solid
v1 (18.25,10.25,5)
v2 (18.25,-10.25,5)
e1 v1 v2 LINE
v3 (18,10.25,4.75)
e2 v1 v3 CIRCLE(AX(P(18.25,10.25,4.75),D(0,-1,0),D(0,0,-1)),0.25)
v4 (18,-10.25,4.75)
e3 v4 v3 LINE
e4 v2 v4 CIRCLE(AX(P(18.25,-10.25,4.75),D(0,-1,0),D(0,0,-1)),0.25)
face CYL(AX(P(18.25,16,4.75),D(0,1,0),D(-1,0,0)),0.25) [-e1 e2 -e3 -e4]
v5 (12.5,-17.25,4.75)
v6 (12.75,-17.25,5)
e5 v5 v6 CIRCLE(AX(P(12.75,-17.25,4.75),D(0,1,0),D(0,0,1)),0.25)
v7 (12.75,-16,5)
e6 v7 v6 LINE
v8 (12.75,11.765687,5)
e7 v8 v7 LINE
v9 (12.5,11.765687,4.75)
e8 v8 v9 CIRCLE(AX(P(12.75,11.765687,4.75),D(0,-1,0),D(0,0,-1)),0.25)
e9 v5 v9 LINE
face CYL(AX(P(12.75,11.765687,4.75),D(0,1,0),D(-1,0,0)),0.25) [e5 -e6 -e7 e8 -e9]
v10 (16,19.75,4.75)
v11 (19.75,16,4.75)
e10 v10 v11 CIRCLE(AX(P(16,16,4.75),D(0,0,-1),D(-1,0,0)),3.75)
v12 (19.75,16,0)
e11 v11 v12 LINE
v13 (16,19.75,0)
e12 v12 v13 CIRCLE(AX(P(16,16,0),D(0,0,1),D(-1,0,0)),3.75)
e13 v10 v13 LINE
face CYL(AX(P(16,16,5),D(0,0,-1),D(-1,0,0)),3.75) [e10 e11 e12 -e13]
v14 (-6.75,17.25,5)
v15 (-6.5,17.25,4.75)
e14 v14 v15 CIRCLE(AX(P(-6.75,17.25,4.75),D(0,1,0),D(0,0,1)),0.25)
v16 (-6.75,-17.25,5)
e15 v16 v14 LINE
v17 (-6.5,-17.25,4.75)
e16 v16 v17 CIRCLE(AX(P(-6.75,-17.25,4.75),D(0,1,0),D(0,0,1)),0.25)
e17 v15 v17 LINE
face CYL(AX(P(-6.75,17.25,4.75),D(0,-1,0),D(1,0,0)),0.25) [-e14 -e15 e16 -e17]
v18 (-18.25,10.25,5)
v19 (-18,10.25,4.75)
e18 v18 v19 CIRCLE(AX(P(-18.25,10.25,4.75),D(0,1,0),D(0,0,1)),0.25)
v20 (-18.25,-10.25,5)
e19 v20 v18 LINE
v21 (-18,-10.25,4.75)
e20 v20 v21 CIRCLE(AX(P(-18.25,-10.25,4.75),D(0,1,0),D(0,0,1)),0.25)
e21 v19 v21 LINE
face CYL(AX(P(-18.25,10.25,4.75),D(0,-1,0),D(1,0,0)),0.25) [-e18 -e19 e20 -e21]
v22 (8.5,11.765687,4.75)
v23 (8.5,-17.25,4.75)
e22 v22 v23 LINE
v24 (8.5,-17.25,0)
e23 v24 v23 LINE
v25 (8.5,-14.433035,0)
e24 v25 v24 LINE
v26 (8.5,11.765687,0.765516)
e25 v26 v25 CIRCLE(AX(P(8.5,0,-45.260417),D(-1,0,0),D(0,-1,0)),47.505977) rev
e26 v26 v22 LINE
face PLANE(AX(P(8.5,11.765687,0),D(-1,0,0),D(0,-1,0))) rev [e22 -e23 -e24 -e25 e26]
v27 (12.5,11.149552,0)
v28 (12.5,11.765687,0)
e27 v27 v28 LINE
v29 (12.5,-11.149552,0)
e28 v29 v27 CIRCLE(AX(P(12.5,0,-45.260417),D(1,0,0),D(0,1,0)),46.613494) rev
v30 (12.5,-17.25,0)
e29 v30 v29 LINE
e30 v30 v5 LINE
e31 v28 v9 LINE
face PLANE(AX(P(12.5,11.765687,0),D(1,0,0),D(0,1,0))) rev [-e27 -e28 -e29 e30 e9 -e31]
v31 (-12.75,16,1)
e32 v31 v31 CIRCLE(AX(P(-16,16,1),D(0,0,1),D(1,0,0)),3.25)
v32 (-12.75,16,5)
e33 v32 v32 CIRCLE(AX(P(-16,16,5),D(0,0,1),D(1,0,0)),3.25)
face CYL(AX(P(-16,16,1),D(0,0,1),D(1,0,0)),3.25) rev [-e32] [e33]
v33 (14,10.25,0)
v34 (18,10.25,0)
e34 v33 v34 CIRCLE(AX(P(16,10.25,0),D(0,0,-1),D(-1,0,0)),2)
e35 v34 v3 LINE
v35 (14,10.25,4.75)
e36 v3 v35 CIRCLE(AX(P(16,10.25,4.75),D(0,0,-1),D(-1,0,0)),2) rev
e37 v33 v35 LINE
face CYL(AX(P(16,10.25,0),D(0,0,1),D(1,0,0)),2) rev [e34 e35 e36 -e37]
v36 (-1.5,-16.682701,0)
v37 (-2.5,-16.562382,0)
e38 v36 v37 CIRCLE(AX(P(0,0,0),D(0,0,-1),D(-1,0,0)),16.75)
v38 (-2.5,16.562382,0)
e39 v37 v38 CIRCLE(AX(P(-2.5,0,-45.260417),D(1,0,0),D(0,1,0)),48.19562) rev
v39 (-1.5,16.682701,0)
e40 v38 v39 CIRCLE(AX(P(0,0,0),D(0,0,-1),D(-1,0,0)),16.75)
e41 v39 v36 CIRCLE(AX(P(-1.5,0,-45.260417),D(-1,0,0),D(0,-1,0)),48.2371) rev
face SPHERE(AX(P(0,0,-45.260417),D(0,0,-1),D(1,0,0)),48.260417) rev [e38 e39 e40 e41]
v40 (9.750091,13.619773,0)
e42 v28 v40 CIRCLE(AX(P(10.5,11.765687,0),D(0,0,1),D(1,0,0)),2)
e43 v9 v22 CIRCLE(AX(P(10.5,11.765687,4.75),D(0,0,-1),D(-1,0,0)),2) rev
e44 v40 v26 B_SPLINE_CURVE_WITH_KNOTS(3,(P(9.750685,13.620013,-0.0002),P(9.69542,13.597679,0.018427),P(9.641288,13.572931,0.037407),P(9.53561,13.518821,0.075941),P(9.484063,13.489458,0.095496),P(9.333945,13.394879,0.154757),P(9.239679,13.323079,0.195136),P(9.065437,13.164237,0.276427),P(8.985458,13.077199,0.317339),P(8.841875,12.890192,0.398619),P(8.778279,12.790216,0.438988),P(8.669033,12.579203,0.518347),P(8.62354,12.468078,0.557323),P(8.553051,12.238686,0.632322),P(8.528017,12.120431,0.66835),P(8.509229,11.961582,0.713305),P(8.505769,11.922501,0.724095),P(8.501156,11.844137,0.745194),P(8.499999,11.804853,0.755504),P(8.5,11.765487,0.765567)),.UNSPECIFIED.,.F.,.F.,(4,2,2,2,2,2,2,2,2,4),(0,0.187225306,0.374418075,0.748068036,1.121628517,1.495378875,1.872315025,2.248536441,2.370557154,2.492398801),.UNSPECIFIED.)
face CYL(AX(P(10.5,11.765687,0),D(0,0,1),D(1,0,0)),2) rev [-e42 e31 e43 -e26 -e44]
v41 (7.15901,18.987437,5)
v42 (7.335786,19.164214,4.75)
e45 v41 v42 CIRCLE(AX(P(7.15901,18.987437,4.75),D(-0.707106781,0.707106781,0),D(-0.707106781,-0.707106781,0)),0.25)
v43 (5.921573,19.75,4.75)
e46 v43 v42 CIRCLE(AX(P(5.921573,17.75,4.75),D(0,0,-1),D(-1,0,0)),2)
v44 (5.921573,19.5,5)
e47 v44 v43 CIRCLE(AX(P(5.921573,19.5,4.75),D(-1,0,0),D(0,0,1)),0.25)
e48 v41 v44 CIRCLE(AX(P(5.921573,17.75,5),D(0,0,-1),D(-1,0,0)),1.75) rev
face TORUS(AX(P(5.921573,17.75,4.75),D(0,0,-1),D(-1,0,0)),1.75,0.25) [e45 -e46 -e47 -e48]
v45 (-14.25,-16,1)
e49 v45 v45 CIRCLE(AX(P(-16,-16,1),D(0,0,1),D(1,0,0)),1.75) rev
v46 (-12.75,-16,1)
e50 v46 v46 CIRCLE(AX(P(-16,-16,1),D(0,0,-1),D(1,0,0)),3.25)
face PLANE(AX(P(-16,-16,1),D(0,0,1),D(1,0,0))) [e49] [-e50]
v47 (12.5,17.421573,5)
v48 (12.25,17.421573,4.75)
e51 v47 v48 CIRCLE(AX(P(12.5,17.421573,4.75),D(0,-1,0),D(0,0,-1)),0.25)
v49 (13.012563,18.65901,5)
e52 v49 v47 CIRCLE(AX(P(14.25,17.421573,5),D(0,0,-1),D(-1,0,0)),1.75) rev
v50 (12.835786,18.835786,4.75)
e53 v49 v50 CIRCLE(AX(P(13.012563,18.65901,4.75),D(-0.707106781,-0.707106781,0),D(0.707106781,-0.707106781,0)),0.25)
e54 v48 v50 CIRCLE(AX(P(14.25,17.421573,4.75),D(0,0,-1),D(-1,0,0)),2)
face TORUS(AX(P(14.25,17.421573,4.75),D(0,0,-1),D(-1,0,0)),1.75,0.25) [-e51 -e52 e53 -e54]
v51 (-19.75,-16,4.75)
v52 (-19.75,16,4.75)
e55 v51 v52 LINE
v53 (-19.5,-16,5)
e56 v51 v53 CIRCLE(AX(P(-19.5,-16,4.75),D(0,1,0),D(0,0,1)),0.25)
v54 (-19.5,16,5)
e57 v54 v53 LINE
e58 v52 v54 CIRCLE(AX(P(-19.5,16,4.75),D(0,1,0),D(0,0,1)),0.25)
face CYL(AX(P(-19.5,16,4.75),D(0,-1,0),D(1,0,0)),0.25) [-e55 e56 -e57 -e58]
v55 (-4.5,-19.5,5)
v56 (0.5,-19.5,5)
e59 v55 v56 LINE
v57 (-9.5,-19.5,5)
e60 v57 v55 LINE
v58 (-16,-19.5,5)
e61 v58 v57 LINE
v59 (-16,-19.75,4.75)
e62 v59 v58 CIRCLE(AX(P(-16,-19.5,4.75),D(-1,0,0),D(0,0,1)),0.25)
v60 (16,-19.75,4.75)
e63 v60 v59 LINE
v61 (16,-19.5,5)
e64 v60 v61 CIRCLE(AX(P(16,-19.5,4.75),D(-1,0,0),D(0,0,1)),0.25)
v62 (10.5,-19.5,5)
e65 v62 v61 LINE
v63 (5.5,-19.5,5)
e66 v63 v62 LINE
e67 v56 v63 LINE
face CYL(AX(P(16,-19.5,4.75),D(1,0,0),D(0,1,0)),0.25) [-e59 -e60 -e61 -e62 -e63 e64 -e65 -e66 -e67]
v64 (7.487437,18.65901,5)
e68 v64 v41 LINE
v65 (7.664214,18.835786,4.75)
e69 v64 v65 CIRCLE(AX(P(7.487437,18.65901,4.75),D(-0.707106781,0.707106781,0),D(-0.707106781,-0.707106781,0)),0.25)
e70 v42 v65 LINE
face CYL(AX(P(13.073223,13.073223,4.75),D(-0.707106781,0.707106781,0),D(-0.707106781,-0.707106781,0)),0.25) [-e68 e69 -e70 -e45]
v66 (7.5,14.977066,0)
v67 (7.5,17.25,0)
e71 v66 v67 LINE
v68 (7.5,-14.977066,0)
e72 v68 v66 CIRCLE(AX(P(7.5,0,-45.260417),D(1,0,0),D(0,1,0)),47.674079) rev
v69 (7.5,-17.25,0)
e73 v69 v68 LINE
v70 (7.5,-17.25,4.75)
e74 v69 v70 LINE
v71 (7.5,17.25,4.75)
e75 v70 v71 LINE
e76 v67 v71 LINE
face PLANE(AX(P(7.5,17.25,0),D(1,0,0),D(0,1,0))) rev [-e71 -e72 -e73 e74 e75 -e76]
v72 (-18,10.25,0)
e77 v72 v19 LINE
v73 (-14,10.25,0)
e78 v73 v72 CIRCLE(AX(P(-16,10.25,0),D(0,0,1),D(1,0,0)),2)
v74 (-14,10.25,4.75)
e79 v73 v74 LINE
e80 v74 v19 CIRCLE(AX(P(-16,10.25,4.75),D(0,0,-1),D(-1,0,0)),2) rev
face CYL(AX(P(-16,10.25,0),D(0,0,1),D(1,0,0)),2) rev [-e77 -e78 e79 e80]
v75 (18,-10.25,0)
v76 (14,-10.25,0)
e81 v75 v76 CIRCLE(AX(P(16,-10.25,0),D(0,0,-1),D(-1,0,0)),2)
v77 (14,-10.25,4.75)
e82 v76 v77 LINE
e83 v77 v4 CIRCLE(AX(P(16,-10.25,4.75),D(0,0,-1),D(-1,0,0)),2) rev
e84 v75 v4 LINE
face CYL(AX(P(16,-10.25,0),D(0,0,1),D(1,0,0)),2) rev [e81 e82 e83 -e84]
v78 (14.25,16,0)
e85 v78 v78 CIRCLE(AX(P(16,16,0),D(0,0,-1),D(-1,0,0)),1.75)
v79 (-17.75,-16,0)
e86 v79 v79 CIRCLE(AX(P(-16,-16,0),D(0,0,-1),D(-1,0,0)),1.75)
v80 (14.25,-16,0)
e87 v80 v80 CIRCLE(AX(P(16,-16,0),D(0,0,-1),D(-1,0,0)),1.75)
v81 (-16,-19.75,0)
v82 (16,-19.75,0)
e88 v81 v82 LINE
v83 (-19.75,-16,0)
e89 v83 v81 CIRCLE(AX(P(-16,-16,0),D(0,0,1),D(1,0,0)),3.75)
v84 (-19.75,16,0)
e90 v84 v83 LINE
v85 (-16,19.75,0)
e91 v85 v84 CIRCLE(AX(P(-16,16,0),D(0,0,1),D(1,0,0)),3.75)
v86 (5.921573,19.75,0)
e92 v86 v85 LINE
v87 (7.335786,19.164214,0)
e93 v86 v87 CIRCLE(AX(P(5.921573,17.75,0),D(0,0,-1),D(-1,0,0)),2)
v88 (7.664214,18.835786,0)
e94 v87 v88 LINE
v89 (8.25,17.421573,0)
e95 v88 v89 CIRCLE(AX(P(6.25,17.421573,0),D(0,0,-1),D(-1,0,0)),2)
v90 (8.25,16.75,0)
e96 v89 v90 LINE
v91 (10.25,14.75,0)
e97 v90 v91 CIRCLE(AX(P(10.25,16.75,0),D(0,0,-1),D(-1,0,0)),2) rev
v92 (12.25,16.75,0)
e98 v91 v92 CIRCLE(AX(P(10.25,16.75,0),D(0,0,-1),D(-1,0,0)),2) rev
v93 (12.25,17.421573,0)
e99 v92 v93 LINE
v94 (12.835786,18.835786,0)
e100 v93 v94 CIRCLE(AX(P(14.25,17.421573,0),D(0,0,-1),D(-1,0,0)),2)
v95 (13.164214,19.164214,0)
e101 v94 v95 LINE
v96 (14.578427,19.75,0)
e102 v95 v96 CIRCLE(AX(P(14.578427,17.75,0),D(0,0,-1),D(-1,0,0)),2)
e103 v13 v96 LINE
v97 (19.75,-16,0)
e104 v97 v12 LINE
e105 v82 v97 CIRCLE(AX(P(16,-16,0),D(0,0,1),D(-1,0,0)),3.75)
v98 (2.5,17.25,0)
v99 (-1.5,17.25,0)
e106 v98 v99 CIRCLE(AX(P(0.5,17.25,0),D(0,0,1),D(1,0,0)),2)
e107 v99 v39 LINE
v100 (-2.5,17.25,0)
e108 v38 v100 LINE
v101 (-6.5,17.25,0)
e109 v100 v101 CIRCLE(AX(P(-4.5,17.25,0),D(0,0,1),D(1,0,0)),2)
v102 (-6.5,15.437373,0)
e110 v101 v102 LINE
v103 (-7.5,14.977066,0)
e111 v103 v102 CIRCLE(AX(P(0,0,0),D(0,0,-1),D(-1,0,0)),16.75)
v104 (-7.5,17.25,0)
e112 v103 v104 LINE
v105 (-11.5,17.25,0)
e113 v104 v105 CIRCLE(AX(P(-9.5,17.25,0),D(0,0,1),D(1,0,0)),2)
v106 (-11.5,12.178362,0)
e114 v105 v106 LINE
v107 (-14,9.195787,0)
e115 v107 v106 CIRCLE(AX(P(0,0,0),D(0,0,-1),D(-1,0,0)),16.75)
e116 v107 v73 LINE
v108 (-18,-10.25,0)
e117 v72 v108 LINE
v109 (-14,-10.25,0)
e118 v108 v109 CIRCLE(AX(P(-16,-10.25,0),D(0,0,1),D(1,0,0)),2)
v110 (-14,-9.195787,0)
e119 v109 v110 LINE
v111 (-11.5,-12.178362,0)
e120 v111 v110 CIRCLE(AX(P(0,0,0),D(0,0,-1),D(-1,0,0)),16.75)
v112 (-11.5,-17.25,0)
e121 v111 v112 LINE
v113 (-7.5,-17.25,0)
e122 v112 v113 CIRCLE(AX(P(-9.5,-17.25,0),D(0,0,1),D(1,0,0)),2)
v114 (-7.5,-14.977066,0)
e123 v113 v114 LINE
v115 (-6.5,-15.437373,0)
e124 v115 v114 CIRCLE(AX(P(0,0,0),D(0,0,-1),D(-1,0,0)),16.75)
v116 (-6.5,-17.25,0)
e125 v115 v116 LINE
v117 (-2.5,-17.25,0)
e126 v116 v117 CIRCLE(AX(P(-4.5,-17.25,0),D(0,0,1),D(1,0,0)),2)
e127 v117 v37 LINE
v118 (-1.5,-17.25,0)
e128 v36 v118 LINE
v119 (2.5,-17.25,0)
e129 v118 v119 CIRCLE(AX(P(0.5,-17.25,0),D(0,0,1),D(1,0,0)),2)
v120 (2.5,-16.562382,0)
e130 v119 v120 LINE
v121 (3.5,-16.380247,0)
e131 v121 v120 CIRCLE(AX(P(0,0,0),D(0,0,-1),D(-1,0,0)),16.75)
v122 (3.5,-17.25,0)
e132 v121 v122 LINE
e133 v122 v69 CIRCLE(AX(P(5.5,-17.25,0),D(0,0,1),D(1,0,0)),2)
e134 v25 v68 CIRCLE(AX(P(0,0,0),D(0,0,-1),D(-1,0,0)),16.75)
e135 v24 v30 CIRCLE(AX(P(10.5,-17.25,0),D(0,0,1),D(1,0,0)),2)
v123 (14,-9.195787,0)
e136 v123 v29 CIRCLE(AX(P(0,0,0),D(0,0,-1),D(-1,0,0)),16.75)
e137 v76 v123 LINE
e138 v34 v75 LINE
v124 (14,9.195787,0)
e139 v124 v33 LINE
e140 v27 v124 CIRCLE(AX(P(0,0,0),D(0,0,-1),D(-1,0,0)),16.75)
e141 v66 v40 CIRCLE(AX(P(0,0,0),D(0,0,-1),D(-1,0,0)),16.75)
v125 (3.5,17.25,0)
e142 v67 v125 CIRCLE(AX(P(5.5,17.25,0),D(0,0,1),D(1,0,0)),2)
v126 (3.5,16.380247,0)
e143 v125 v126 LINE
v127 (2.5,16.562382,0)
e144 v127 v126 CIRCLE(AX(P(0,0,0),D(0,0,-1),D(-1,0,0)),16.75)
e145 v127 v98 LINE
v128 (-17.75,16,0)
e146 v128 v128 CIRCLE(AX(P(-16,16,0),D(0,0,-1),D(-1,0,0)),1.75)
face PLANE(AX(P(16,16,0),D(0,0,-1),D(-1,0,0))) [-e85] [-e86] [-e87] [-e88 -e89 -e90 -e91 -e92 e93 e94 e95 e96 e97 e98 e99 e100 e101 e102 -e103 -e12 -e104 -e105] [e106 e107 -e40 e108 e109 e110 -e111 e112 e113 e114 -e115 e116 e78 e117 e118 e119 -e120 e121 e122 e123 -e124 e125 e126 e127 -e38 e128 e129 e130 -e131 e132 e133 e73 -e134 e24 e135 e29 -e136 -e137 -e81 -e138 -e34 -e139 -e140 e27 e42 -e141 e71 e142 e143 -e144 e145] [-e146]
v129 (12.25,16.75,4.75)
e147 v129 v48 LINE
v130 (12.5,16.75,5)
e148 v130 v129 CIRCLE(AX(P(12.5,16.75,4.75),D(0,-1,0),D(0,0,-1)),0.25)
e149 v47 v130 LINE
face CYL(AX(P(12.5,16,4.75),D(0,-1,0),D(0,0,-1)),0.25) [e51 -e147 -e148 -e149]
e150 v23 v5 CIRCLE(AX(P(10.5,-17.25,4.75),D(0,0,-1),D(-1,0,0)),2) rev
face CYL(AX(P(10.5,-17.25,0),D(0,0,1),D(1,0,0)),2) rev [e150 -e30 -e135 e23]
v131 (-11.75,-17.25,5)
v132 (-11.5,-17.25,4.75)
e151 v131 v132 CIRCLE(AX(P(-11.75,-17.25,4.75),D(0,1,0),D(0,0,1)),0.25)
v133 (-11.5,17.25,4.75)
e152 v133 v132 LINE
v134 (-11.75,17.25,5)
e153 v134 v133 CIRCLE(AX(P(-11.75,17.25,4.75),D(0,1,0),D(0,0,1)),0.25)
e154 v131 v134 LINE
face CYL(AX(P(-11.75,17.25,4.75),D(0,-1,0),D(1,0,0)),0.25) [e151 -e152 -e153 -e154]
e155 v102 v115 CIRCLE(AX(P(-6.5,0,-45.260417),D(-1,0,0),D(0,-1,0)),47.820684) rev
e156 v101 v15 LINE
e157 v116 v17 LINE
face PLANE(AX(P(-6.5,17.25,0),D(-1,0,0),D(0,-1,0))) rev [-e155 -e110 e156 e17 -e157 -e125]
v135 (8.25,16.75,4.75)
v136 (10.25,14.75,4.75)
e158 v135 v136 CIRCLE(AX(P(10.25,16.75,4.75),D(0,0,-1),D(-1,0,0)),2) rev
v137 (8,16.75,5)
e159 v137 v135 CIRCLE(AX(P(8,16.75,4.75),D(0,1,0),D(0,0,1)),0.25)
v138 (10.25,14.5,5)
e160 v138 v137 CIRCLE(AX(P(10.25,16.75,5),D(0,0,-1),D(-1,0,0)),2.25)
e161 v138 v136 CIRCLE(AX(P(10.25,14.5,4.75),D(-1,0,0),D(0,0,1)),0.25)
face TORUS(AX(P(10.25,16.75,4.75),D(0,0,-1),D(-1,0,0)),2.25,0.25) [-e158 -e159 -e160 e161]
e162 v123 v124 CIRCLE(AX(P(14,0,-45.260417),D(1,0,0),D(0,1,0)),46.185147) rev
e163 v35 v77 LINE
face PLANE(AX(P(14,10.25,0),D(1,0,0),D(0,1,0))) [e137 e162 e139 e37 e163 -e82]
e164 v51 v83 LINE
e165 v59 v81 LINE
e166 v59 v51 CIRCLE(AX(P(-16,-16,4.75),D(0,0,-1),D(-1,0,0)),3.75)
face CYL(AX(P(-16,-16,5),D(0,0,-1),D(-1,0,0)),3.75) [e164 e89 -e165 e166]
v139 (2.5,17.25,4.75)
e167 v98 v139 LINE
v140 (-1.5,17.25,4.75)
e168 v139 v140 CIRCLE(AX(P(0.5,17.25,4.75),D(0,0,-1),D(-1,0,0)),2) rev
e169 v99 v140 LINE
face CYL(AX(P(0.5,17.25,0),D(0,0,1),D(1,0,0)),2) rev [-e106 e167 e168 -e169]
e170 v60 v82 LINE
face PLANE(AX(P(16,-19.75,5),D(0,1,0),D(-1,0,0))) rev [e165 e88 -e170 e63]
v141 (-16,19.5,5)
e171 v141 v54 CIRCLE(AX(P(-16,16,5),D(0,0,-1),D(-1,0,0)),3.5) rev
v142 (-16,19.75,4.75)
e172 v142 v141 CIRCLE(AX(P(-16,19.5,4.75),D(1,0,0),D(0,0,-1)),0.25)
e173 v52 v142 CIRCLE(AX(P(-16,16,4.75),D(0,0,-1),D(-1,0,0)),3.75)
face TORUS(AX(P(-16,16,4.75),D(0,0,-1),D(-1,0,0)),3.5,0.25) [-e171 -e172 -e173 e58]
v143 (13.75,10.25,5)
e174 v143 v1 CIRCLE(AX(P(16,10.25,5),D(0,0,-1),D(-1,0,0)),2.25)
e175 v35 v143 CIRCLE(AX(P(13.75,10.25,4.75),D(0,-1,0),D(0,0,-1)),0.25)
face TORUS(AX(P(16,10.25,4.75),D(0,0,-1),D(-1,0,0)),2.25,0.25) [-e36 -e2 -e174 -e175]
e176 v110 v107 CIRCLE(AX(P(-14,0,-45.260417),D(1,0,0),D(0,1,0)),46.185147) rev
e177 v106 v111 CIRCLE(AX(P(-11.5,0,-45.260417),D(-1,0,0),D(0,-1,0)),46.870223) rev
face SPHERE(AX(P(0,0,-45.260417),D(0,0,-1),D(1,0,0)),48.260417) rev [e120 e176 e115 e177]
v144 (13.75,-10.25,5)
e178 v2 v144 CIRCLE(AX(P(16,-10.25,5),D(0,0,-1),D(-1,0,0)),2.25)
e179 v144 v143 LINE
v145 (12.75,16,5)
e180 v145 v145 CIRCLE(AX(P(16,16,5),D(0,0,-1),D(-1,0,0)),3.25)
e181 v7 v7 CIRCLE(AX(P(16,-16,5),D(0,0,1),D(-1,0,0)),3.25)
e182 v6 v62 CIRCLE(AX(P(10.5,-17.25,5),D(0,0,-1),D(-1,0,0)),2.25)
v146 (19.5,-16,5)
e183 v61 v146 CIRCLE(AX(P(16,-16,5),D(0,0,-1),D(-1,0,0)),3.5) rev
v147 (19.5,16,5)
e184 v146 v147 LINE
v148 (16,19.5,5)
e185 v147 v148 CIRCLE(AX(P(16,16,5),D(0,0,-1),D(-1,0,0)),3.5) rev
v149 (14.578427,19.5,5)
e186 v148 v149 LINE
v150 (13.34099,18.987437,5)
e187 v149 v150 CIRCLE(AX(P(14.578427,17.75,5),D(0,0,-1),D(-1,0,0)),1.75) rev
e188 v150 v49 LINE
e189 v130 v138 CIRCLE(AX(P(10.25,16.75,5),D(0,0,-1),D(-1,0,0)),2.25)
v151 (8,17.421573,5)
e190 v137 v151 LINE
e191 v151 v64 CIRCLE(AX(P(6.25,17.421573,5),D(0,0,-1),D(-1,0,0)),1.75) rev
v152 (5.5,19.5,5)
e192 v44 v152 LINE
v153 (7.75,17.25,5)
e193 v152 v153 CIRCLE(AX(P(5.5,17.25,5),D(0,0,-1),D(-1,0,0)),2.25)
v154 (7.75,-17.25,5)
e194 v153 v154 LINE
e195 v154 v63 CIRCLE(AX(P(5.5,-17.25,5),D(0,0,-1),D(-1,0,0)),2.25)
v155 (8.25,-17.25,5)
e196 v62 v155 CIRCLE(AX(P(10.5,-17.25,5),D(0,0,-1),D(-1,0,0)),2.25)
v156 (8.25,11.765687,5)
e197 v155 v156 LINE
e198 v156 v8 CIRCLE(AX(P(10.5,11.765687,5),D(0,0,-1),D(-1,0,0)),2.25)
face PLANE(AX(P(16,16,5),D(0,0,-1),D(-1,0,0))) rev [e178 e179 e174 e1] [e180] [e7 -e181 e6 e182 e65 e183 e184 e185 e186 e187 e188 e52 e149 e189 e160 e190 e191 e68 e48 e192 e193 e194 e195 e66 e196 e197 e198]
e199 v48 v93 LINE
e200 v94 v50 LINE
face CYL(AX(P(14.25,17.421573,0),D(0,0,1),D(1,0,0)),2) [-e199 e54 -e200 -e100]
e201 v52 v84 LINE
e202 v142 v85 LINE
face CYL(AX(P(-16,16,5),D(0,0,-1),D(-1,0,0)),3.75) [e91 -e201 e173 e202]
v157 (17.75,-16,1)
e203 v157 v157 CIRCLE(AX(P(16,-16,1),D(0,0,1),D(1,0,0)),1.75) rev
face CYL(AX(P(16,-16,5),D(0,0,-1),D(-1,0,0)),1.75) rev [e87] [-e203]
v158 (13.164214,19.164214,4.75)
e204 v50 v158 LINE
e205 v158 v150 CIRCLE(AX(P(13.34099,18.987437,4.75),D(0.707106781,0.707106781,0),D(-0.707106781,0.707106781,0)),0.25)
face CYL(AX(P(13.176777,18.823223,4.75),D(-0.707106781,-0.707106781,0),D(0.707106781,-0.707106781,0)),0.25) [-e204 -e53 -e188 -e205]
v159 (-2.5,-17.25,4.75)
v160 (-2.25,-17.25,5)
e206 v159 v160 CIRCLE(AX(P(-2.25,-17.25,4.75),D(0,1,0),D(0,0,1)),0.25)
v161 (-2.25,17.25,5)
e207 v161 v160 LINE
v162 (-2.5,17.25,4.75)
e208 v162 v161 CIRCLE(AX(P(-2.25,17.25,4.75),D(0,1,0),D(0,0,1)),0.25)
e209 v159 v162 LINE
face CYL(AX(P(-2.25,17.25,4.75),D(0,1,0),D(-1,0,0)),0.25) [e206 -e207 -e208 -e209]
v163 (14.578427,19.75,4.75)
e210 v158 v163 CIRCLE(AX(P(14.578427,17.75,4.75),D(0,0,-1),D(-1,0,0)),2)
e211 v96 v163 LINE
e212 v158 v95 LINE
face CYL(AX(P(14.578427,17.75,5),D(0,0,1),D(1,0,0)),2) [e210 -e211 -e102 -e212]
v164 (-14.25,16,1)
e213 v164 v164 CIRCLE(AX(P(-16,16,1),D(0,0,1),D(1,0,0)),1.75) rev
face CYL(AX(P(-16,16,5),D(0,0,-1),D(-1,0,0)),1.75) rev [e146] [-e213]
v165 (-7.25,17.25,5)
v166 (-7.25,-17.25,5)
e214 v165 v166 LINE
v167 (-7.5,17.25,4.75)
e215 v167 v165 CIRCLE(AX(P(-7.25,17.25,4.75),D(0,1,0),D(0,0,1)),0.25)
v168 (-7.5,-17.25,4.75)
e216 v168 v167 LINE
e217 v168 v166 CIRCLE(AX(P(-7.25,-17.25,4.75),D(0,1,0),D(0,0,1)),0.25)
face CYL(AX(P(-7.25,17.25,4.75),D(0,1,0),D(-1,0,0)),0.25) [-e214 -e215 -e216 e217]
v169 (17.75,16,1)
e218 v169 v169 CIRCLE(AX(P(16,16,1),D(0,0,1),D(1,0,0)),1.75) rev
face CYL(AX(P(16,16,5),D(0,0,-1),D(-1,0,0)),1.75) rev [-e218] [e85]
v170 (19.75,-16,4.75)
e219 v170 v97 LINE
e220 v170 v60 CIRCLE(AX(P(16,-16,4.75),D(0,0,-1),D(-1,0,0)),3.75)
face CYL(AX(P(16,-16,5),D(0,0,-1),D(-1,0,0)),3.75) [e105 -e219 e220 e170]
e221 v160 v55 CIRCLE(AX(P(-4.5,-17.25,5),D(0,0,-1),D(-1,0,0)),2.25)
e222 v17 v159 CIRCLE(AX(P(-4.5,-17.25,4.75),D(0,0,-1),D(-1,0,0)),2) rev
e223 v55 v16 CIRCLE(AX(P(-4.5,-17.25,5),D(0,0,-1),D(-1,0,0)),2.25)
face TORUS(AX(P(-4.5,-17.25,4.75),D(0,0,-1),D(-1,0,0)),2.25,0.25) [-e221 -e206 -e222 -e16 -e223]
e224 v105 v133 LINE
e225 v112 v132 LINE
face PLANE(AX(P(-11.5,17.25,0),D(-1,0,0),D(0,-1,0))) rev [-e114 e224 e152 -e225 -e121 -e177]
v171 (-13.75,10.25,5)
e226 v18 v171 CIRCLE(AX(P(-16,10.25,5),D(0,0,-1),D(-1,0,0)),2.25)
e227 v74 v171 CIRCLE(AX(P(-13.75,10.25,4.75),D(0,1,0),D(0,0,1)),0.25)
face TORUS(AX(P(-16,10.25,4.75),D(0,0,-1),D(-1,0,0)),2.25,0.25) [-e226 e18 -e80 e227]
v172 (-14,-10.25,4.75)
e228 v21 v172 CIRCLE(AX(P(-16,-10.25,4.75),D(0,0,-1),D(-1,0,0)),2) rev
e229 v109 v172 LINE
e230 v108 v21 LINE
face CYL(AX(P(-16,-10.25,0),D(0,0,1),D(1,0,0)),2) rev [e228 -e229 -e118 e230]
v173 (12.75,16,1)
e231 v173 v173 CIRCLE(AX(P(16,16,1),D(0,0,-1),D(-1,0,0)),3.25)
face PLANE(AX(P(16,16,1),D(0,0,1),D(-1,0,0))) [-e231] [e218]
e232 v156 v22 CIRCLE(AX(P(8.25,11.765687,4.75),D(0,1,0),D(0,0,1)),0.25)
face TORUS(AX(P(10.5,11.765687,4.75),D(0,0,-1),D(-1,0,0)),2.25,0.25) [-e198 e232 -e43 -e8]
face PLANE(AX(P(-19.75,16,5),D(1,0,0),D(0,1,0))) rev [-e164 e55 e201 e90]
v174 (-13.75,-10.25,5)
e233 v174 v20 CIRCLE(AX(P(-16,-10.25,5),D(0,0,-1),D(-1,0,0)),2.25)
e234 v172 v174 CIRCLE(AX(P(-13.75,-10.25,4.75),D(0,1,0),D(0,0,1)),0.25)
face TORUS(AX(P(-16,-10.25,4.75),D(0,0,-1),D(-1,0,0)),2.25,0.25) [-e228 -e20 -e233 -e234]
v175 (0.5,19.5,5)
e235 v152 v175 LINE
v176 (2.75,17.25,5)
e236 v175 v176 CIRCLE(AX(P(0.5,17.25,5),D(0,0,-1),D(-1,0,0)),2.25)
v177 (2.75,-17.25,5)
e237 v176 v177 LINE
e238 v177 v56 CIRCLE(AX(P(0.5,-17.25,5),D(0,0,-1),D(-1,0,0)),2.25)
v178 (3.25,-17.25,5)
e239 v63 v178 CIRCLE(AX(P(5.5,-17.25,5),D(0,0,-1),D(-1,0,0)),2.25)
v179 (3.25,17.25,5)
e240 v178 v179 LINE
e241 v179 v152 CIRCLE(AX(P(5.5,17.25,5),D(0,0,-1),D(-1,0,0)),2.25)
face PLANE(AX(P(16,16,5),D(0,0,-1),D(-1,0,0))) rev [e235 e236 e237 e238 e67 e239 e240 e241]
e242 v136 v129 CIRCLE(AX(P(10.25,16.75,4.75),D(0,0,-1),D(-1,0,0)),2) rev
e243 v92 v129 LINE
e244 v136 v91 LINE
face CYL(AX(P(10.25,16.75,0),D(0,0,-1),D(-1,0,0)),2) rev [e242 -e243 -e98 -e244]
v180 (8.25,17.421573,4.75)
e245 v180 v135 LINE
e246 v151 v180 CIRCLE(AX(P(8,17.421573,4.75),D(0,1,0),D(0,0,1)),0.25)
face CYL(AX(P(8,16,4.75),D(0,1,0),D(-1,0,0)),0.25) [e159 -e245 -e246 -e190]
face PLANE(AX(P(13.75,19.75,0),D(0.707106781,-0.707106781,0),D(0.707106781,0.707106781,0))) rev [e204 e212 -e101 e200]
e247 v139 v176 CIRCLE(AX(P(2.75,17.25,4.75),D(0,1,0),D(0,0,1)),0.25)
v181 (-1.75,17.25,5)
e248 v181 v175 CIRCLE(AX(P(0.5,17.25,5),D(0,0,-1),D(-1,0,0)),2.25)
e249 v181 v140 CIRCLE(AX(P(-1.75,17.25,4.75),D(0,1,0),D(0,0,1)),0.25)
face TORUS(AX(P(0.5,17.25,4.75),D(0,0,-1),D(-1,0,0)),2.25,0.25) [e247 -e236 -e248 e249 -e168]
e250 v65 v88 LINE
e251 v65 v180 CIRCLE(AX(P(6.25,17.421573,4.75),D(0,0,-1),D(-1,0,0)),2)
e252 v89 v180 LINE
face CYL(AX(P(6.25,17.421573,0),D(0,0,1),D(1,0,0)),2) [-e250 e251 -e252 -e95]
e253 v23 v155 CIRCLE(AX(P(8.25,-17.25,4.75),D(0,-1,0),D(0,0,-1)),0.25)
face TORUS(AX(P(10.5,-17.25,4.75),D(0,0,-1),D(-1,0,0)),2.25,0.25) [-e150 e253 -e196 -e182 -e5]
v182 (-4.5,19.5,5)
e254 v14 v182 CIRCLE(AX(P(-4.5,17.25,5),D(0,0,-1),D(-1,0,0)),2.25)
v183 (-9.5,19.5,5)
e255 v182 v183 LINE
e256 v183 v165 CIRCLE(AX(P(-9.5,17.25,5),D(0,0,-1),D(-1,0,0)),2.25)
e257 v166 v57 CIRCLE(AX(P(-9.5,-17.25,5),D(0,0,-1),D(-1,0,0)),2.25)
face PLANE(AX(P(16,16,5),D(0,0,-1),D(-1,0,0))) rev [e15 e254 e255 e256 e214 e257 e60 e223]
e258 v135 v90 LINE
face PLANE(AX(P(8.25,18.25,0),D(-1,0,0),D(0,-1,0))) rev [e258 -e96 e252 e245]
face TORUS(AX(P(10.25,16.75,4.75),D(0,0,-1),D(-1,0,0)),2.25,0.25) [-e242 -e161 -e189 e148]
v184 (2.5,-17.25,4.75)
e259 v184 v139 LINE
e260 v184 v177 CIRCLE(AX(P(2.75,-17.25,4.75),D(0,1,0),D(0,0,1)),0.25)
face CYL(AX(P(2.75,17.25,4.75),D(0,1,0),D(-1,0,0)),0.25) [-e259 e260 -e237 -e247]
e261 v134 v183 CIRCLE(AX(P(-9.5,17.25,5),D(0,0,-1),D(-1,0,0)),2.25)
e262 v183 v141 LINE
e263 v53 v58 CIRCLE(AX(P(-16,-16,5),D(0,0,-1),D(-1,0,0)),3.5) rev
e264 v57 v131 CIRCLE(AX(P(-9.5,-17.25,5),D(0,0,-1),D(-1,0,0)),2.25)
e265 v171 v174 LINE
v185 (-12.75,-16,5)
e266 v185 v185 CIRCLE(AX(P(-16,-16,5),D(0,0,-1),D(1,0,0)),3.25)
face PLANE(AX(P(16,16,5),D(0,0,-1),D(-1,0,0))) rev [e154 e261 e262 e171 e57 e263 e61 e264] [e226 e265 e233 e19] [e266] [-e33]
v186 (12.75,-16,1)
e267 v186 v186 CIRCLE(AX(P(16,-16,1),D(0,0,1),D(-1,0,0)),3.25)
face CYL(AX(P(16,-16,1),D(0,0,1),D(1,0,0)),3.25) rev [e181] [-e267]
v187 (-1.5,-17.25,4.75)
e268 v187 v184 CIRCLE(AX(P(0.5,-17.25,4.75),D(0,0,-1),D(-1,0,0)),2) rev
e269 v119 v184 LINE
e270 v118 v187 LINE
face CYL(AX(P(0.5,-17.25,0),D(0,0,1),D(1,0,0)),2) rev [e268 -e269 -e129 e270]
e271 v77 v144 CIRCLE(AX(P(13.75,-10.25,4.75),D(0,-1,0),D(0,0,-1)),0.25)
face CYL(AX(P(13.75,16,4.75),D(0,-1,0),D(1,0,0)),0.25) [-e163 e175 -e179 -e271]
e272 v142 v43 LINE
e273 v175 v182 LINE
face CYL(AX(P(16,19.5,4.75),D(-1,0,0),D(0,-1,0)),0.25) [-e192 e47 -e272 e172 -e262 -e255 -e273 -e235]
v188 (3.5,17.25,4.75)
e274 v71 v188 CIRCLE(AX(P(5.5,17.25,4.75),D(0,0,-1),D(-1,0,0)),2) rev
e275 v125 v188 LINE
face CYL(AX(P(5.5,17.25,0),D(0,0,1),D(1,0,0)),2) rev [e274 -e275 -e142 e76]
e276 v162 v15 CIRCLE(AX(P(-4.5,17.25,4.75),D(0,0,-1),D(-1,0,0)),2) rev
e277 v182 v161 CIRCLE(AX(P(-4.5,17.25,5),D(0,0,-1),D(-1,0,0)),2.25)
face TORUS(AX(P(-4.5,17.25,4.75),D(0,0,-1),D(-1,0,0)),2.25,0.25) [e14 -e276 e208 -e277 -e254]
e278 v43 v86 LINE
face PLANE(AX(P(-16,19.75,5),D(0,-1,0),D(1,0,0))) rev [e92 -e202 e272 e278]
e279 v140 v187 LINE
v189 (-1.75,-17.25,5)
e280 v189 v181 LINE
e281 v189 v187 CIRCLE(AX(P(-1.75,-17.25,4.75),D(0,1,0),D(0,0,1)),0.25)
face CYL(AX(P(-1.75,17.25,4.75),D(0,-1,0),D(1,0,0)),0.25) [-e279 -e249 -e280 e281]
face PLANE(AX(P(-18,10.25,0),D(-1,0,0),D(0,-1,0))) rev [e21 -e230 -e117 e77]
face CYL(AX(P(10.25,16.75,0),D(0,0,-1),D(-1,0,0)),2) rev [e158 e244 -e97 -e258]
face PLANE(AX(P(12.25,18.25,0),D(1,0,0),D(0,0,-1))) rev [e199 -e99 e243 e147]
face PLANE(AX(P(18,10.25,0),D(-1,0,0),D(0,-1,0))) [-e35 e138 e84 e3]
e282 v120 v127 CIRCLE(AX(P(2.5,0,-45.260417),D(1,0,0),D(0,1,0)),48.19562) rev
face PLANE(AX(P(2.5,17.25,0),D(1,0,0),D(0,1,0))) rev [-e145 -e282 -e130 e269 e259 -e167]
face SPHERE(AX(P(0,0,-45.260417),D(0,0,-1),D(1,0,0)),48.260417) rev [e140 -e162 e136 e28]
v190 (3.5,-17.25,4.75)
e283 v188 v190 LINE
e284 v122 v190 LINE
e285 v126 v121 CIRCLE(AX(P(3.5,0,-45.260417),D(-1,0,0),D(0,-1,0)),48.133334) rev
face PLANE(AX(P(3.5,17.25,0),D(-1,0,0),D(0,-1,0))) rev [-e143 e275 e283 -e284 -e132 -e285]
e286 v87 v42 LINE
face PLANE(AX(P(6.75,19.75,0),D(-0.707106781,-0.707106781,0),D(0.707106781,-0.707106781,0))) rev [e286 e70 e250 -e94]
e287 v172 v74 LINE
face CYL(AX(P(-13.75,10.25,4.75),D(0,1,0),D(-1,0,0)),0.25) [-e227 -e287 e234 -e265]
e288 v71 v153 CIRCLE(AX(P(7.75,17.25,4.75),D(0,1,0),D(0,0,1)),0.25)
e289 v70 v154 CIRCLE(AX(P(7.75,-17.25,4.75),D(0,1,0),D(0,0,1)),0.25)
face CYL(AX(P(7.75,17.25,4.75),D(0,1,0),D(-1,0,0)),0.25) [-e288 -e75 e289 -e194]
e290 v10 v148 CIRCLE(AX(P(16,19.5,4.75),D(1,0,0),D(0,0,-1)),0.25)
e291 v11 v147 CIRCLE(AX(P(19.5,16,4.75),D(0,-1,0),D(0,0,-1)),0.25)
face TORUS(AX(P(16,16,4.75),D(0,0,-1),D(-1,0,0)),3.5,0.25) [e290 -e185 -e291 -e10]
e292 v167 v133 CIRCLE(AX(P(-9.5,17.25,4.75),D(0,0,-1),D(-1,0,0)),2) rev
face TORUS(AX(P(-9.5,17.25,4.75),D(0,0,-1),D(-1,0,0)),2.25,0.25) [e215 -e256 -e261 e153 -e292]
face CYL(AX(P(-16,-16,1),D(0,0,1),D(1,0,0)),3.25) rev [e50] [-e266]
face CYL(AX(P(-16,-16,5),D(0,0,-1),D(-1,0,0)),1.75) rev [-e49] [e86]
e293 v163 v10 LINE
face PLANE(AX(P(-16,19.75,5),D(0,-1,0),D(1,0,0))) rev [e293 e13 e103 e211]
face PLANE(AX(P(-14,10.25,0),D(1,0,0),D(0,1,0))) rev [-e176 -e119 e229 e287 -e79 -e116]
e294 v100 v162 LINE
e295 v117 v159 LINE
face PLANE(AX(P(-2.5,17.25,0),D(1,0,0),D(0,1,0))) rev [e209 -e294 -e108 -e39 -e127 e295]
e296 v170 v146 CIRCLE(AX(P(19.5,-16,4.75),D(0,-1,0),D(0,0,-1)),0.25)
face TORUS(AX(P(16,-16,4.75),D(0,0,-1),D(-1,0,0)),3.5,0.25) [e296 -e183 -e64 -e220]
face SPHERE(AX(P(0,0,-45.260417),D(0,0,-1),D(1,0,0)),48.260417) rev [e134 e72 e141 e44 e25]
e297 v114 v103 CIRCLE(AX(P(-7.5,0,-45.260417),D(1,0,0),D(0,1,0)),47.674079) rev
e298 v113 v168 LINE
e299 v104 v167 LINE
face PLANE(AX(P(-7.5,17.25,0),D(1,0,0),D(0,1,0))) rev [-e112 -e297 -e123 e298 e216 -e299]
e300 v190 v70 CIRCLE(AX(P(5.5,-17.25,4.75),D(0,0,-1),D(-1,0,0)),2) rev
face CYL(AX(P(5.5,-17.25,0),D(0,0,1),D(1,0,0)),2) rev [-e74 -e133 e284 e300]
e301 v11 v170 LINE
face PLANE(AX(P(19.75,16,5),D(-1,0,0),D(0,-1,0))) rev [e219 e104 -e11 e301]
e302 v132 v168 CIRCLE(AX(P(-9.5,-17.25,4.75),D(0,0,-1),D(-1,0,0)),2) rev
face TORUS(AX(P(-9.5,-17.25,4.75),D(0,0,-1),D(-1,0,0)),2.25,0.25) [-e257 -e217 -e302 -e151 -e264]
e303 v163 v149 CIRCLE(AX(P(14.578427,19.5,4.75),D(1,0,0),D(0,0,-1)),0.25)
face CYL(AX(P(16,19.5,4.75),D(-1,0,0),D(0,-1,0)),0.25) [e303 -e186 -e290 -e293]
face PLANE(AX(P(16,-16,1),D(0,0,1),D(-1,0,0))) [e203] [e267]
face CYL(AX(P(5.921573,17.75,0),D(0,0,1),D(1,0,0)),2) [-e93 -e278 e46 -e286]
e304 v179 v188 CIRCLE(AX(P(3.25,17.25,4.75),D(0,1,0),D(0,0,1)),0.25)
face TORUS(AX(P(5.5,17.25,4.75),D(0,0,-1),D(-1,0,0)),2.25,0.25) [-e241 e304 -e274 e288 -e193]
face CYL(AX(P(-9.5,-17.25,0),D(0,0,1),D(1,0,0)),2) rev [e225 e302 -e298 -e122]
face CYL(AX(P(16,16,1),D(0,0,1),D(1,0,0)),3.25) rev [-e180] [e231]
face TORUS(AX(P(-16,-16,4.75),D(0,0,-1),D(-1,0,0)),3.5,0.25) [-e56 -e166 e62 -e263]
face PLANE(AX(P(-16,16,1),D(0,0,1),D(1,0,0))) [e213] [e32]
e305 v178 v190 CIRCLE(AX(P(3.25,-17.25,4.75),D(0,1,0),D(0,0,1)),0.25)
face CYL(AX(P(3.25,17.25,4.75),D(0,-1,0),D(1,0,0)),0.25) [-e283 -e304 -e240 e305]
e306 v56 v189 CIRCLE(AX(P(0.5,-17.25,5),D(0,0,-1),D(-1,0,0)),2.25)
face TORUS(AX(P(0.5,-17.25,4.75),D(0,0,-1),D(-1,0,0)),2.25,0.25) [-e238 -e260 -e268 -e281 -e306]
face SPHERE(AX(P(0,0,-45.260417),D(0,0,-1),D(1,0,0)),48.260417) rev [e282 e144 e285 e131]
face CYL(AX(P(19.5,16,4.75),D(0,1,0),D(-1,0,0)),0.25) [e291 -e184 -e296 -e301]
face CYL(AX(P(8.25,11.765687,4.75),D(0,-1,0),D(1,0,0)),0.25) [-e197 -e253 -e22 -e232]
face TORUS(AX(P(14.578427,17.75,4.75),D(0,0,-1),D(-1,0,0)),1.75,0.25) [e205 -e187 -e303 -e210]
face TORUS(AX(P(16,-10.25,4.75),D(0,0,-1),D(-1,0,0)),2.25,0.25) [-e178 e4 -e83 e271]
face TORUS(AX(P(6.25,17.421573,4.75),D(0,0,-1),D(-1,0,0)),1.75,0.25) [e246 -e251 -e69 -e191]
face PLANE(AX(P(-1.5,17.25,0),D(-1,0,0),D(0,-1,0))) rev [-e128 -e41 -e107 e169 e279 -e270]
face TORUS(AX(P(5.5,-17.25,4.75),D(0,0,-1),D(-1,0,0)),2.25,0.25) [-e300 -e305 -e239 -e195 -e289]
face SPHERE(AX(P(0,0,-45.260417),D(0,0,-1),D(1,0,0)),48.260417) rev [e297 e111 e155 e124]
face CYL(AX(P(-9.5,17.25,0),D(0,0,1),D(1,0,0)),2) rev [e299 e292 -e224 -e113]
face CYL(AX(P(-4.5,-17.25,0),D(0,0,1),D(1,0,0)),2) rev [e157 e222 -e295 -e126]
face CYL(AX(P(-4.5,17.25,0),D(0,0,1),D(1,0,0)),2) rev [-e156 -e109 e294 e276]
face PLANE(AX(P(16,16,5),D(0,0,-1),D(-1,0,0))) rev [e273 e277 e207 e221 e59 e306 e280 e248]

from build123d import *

# Parameters (mm, degrees)
BOSS_EXTRUDE1_DEPTH     = 5
CUT_EXTRUDE1_DEPTH      = 29.374724668
CUT_EXTRUDE1_DEPTH_BACK = 29.374724668
SKETCH2_R               = 1.75
SKETCH3_R               = 3.25
CUT_EXTRUDE2_DEPTH      = 4
MIRROR2_COPY_1_SKETCH_R = 3.25
MIRROR2_COPY_1_DEPTH    = 4
CUT_EXTRUDE3_DEPTH      = 29.374724668
CUT_EXTRUDE4_DEPTH      = 29.374724668
LPATTERN1_COUNT         = 5
LPATTERN1_PITCH         = 5
CUT_EXTRUDE5_DEPTH      = 29.374724668
CUT_EXTRUDE5_DEPTH_BACK = 29.374724668
FILLET5_R               = 2
CUT_EXTRUDE6_DEPTH      = 29.374724668
CUT_EXTRUDE6_DEPTH_BACK = 29.374724668
FILLET3_R               = 0.25
FILLET2_R               = 0.25


with BuildPart() as part:
    # Sketch1 → Boss-Extrude1 (new body)
    with BuildSketch(Plane.XY):
        with BuildLine():
            Line((19.75, 16), (19.75, -16))
            ThreePointArc((19.75, -16), (18.651650429, -18.651650429), (16, -19.75))
            Line((16, -19.75), (-16, -19.75))
            ThreePointArc((-16, -19.75), (-18.651650429, -18.651650429), (-19.75, -16))
            Line((-19.75, -16), (-19.75, 16))
            ThreePointArc((-19.75, 16), (-18.651650429, 18.651650429), (-16, 19.75))
            Line((-16, 19.75), (16, 19.75))
            ThreePointArc((16, 19.75), (18.651650429, 18.651650429), (19.75, 16))
        make_face()
    extrude(amount=BOSS_EXTRUDE1_DEPTH)

    # Sketch2 → Cut-Extrude1 (cut, two sides: drawn at the far end of the back side and taken through both)
    with BuildSketch(Plane(origin=(0, 0, 0), x_dir=(-1, 0, 0), z_dir=(0, 0, -1)).offset(-CUT_EXTRUDE1_DEPTH_BACK)):
        with Locations((-16, 16)):
            Circle(SKETCH2_R)
        with Locations((16, 16)):
            Circle(SKETCH2_R)
        with Locations((16, -16)):
            Circle(SKETCH2_R)
        with Locations((-16, -16)):
            Circle(SKETCH2_R)
    extrude(amount=CUT_EXTRUDE1_DEPTH + CUT_EXTRUDE1_DEPTH_BACK, mode=Mode.SUBTRACT)

    # Sketch3 → Cut-Extrude2 (cut)
    with BuildSketch(Plane.XY.offset(5)):
        with Locations((-16, 16)):
            Circle(SKETCH3_R)
    cut_extrude2 = extrude(amount=-CUT_EXTRUDE2_DEPTH, mode=Mode.SUBTRACT)

    # Mirror1: Cut-Extrude2 across plane
    add(cut_extrude2.mirror(Plane(origin=(0, 0, 0), x_dir=(0, 0, 1), z_dir=(1, 0, 0))), mode=Mode.SUBTRACT)

    # Mirror2: Cut-Extrude2 across plane
    add(cut_extrude2.mirror(Plane.ZX), mode=Mode.SUBTRACT)

    # Mirror2 copy 1 sketch → Mirror2 copy 1 (cut)
    with BuildSketch(Plane(origin=(0, 0, 5), x_dir=(-1, 0, 0), z_dir=(0, 0, 1))):
        with Locations((-16, 16)):
            Circle(MIRROR2_COPY_1_SKETCH_R)
    extrude(amount=-MIRROR2_COPY_1_DEPTH, mode=Mode.SUBTRACT)

    # Sketch4 → Cut-Extrude3 (cut, symmetric)
    with BuildSketch(Plane.XY.offset(5)):
        with BuildLine():
            Line((-14, 10.25), (-14, -10.25))
            ThreePointArc((-14, -10.25), (-16, -12.25), (-18, -10.25))
            Line((-18, -10.25), (-18, 10.25))
            ThreePointArc((-18, 10.25), (-16, 12.25), (-14, 10.25))
        make_face()
    cut_extrude3 = extrude(amount=CUT_EXTRUDE3_DEPTH, both=True, mode=Mode.SUBTRACT)

    # Mirror3: Cut-Extrude3 across plane
    add(cut_extrude3.mirror(Plane(origin=(0, 0, 0), x_dir=(0, 0, 1), z_dir=(1, 0, 0))), mode=Mode.SUBTRACT)

    # Sketch5 → Cut-Extrude4 (cut, symmetric)
    with BuildSketch(Plane.XY.offset(5)):
        with BuildLine():
            Line((-7.5, 17.25), (-7.5, -17.25))
            ThreePointArc((-7.5, -17.25), (-9.5, -19.25), (-11.5, -17.25))
            Line((-11.5, -17.25), (-11.5, 17.25))
            ThreePointArc((-11.5, 17.25), (-9.5, 19.25), (-7.5, 17.25))
        make_face()
    cut_extrude4 = extrude(amount=CUT_EXTRUDE4_DEPTH, both=True, mode=Mode.SUBTRACT)

    # LPattern1: Cut-Extrude4 ×5, 1 skipped
    with Locations(*[(i * LPATTERN1_PITCH, 0, 0) for i in range(1, LPATTERN1_COUNT) if i not in (4,)]):
        add(cut_extrude4, mode=Mode.SUBTRACT)

    # Sketch9 → Cut-Extrude5 (cut, two sides: drawn at the far end of the back side and taken through both)
    with BuildSketch(Plane.XY.offset(5).offset(-CUT_EXTRUDE5_DEPTH_BACK)):
        Polygon((12.25, 19.75), (8.25, 19.75), (6.75, 19.75), (8.25, 18.25), (8.25, 14.75), (12.25, 14.75), (12.25, 18.25), (13.75, 19.75), align=None)
    extrude(amount=CUT_EXTRUDE5_DEPTH + CUT_EXTRUDE5_DEPTH_BACK, mode=Mode.SUBTRACT)

    # Fillet5
    fillet5_edges = [part.edges().sort_by_distance(p)[0] for p in [
        (13.75, 19.75, 2.5),
        (12.25, 18.25, 2.5),
        (6.75, 19.75, 2.5),
        (8.25, 18.25, 2.5),
        (8.25, 14.75, 2.5),
        (12.25, 14.75, 2.5),
    ]]
    fillet(fillet5_edges, radius=FILLET5_R - 0.0001)  # a hair under: the kernel refuses the full size

    # Sketch10 → Cut-Extrude6 (cut, two sides: drawn at the far end of the back side and taken through both)
    with BuildSketch(Plane.XY.offset(5).offset(-CUT_EXTRUDE6_DEPTH_BACK)):
        with BuildLine():
            Line((12.5, 11.765686517), (12.5, -17.25))
            ThreePointArc((12.5, -17.25), (10.5, -19.25), (8.5, -17.25))
            Line((8.5, -17.25), (8.5, 11.765686517))
            ThreePointArc((8.5, 11.765686517), (10.5, 13.765686517), (12.5, 11.765686517))
        make_face()
    extrude(amount=CUT_EXTRUDE6_DEPTH + CUT_EXTRUDE6_DEPTH_BACK, mode=Mode.SUBTRACT)

    # Sketch6 → Cut-Revolve1 (revolve, cut)
    with BuildSketch(Plane(origin=(0, 0, 0), x_dir=(1, 0, 0), z_dir=(0, 1, 0))):
        with BuildLine():
            Line((0, 0), (0, -3))
            ThreePointArc((0, -3), (8.508268038, -2.244079877), (16.75, 0))
            Line((16.75, 0), (0, 0))
        make_face()
    revolve(axis=Axis((0, 0, -0.25), (0, 0, 1)), mode=Mode.SUBTRACT)

    # Fillet3
    fillet3_edges = [part.edges().sort_by_distance(p)[0] for p in [
        (-9.5, 19.25, 5),
        (-11.5, 0, 5),
        (-9.5, -19.25, 5),
        (-7.5, 0, 5),
        (-4.5, 19.25, 5),
        (-6.5, 0, 5),
        (-4.5, -19.25, 5),
        (-2.5, 0, 5),
        (0.5, 19.25, 5),
        (2.5, 0, 5),
        (0.5, -19.25, 5),
        (-1.5, 0, 5),
        (5.5, 19.25, 5),
        (7.5, 0, 5),
        (5.5, -19.25, 5),
        (3.5, 0, 5),
        (10.5, 13.765686517, 5),
        (8.5, -2.742156742, 5),
        (10.5, -19.25, 5),
        (12.5, -2.742156742, 5),
        (-16, 12.25, 5),
        (-18, 0, 5),
        (-16, -12.25, 5),
        (-14, 0, 5),
        (16, 12.25, 5),
        (18, 0, 5),
        (16, -12.25, 5),
        (14, 0, 5),
    ]]
    fillet(fillet3_edges, radius=FILLET3_R - 0.0001)  # a hair under: the kernel refuses the full size

    # Fillet2
    fillet2_edges = [part.edges().sort_by_distance(p)[0] for p in [
        (-18.651650429, 18.651650429, 5),
        (-19.75, 0, 5),
        (8.25, 17.085757148, 5),
        (12.25, 17.085757148, 5),
        (13, 19, 5),
        (7.5, 19, 5),
        (-5.039192852, 19.75, 5),
        (8.097766677, 18.186942893, 5),
        (6.686942893, 19.597766677, 5),
        (12.402233323, 18.186942893, 5),
        (13.813057107, 19.597766677, 5),
        (-18.651650429, -18.651650429, 5),
        (8.835757148, 15.335757148, 5),
        (11.664242852, 15.335757148, 5),
        (0, -19.75, 5),
        (18.651650429, -18.651650429, 5),
        (19.75, 0, 5),
        (18.651650429, 18.651650429, 5),
        (15.289192852, 19.75, 5),
    ]]
    fillet(fillet2_edges, radius=FILLET2_R)


solid = part.part
